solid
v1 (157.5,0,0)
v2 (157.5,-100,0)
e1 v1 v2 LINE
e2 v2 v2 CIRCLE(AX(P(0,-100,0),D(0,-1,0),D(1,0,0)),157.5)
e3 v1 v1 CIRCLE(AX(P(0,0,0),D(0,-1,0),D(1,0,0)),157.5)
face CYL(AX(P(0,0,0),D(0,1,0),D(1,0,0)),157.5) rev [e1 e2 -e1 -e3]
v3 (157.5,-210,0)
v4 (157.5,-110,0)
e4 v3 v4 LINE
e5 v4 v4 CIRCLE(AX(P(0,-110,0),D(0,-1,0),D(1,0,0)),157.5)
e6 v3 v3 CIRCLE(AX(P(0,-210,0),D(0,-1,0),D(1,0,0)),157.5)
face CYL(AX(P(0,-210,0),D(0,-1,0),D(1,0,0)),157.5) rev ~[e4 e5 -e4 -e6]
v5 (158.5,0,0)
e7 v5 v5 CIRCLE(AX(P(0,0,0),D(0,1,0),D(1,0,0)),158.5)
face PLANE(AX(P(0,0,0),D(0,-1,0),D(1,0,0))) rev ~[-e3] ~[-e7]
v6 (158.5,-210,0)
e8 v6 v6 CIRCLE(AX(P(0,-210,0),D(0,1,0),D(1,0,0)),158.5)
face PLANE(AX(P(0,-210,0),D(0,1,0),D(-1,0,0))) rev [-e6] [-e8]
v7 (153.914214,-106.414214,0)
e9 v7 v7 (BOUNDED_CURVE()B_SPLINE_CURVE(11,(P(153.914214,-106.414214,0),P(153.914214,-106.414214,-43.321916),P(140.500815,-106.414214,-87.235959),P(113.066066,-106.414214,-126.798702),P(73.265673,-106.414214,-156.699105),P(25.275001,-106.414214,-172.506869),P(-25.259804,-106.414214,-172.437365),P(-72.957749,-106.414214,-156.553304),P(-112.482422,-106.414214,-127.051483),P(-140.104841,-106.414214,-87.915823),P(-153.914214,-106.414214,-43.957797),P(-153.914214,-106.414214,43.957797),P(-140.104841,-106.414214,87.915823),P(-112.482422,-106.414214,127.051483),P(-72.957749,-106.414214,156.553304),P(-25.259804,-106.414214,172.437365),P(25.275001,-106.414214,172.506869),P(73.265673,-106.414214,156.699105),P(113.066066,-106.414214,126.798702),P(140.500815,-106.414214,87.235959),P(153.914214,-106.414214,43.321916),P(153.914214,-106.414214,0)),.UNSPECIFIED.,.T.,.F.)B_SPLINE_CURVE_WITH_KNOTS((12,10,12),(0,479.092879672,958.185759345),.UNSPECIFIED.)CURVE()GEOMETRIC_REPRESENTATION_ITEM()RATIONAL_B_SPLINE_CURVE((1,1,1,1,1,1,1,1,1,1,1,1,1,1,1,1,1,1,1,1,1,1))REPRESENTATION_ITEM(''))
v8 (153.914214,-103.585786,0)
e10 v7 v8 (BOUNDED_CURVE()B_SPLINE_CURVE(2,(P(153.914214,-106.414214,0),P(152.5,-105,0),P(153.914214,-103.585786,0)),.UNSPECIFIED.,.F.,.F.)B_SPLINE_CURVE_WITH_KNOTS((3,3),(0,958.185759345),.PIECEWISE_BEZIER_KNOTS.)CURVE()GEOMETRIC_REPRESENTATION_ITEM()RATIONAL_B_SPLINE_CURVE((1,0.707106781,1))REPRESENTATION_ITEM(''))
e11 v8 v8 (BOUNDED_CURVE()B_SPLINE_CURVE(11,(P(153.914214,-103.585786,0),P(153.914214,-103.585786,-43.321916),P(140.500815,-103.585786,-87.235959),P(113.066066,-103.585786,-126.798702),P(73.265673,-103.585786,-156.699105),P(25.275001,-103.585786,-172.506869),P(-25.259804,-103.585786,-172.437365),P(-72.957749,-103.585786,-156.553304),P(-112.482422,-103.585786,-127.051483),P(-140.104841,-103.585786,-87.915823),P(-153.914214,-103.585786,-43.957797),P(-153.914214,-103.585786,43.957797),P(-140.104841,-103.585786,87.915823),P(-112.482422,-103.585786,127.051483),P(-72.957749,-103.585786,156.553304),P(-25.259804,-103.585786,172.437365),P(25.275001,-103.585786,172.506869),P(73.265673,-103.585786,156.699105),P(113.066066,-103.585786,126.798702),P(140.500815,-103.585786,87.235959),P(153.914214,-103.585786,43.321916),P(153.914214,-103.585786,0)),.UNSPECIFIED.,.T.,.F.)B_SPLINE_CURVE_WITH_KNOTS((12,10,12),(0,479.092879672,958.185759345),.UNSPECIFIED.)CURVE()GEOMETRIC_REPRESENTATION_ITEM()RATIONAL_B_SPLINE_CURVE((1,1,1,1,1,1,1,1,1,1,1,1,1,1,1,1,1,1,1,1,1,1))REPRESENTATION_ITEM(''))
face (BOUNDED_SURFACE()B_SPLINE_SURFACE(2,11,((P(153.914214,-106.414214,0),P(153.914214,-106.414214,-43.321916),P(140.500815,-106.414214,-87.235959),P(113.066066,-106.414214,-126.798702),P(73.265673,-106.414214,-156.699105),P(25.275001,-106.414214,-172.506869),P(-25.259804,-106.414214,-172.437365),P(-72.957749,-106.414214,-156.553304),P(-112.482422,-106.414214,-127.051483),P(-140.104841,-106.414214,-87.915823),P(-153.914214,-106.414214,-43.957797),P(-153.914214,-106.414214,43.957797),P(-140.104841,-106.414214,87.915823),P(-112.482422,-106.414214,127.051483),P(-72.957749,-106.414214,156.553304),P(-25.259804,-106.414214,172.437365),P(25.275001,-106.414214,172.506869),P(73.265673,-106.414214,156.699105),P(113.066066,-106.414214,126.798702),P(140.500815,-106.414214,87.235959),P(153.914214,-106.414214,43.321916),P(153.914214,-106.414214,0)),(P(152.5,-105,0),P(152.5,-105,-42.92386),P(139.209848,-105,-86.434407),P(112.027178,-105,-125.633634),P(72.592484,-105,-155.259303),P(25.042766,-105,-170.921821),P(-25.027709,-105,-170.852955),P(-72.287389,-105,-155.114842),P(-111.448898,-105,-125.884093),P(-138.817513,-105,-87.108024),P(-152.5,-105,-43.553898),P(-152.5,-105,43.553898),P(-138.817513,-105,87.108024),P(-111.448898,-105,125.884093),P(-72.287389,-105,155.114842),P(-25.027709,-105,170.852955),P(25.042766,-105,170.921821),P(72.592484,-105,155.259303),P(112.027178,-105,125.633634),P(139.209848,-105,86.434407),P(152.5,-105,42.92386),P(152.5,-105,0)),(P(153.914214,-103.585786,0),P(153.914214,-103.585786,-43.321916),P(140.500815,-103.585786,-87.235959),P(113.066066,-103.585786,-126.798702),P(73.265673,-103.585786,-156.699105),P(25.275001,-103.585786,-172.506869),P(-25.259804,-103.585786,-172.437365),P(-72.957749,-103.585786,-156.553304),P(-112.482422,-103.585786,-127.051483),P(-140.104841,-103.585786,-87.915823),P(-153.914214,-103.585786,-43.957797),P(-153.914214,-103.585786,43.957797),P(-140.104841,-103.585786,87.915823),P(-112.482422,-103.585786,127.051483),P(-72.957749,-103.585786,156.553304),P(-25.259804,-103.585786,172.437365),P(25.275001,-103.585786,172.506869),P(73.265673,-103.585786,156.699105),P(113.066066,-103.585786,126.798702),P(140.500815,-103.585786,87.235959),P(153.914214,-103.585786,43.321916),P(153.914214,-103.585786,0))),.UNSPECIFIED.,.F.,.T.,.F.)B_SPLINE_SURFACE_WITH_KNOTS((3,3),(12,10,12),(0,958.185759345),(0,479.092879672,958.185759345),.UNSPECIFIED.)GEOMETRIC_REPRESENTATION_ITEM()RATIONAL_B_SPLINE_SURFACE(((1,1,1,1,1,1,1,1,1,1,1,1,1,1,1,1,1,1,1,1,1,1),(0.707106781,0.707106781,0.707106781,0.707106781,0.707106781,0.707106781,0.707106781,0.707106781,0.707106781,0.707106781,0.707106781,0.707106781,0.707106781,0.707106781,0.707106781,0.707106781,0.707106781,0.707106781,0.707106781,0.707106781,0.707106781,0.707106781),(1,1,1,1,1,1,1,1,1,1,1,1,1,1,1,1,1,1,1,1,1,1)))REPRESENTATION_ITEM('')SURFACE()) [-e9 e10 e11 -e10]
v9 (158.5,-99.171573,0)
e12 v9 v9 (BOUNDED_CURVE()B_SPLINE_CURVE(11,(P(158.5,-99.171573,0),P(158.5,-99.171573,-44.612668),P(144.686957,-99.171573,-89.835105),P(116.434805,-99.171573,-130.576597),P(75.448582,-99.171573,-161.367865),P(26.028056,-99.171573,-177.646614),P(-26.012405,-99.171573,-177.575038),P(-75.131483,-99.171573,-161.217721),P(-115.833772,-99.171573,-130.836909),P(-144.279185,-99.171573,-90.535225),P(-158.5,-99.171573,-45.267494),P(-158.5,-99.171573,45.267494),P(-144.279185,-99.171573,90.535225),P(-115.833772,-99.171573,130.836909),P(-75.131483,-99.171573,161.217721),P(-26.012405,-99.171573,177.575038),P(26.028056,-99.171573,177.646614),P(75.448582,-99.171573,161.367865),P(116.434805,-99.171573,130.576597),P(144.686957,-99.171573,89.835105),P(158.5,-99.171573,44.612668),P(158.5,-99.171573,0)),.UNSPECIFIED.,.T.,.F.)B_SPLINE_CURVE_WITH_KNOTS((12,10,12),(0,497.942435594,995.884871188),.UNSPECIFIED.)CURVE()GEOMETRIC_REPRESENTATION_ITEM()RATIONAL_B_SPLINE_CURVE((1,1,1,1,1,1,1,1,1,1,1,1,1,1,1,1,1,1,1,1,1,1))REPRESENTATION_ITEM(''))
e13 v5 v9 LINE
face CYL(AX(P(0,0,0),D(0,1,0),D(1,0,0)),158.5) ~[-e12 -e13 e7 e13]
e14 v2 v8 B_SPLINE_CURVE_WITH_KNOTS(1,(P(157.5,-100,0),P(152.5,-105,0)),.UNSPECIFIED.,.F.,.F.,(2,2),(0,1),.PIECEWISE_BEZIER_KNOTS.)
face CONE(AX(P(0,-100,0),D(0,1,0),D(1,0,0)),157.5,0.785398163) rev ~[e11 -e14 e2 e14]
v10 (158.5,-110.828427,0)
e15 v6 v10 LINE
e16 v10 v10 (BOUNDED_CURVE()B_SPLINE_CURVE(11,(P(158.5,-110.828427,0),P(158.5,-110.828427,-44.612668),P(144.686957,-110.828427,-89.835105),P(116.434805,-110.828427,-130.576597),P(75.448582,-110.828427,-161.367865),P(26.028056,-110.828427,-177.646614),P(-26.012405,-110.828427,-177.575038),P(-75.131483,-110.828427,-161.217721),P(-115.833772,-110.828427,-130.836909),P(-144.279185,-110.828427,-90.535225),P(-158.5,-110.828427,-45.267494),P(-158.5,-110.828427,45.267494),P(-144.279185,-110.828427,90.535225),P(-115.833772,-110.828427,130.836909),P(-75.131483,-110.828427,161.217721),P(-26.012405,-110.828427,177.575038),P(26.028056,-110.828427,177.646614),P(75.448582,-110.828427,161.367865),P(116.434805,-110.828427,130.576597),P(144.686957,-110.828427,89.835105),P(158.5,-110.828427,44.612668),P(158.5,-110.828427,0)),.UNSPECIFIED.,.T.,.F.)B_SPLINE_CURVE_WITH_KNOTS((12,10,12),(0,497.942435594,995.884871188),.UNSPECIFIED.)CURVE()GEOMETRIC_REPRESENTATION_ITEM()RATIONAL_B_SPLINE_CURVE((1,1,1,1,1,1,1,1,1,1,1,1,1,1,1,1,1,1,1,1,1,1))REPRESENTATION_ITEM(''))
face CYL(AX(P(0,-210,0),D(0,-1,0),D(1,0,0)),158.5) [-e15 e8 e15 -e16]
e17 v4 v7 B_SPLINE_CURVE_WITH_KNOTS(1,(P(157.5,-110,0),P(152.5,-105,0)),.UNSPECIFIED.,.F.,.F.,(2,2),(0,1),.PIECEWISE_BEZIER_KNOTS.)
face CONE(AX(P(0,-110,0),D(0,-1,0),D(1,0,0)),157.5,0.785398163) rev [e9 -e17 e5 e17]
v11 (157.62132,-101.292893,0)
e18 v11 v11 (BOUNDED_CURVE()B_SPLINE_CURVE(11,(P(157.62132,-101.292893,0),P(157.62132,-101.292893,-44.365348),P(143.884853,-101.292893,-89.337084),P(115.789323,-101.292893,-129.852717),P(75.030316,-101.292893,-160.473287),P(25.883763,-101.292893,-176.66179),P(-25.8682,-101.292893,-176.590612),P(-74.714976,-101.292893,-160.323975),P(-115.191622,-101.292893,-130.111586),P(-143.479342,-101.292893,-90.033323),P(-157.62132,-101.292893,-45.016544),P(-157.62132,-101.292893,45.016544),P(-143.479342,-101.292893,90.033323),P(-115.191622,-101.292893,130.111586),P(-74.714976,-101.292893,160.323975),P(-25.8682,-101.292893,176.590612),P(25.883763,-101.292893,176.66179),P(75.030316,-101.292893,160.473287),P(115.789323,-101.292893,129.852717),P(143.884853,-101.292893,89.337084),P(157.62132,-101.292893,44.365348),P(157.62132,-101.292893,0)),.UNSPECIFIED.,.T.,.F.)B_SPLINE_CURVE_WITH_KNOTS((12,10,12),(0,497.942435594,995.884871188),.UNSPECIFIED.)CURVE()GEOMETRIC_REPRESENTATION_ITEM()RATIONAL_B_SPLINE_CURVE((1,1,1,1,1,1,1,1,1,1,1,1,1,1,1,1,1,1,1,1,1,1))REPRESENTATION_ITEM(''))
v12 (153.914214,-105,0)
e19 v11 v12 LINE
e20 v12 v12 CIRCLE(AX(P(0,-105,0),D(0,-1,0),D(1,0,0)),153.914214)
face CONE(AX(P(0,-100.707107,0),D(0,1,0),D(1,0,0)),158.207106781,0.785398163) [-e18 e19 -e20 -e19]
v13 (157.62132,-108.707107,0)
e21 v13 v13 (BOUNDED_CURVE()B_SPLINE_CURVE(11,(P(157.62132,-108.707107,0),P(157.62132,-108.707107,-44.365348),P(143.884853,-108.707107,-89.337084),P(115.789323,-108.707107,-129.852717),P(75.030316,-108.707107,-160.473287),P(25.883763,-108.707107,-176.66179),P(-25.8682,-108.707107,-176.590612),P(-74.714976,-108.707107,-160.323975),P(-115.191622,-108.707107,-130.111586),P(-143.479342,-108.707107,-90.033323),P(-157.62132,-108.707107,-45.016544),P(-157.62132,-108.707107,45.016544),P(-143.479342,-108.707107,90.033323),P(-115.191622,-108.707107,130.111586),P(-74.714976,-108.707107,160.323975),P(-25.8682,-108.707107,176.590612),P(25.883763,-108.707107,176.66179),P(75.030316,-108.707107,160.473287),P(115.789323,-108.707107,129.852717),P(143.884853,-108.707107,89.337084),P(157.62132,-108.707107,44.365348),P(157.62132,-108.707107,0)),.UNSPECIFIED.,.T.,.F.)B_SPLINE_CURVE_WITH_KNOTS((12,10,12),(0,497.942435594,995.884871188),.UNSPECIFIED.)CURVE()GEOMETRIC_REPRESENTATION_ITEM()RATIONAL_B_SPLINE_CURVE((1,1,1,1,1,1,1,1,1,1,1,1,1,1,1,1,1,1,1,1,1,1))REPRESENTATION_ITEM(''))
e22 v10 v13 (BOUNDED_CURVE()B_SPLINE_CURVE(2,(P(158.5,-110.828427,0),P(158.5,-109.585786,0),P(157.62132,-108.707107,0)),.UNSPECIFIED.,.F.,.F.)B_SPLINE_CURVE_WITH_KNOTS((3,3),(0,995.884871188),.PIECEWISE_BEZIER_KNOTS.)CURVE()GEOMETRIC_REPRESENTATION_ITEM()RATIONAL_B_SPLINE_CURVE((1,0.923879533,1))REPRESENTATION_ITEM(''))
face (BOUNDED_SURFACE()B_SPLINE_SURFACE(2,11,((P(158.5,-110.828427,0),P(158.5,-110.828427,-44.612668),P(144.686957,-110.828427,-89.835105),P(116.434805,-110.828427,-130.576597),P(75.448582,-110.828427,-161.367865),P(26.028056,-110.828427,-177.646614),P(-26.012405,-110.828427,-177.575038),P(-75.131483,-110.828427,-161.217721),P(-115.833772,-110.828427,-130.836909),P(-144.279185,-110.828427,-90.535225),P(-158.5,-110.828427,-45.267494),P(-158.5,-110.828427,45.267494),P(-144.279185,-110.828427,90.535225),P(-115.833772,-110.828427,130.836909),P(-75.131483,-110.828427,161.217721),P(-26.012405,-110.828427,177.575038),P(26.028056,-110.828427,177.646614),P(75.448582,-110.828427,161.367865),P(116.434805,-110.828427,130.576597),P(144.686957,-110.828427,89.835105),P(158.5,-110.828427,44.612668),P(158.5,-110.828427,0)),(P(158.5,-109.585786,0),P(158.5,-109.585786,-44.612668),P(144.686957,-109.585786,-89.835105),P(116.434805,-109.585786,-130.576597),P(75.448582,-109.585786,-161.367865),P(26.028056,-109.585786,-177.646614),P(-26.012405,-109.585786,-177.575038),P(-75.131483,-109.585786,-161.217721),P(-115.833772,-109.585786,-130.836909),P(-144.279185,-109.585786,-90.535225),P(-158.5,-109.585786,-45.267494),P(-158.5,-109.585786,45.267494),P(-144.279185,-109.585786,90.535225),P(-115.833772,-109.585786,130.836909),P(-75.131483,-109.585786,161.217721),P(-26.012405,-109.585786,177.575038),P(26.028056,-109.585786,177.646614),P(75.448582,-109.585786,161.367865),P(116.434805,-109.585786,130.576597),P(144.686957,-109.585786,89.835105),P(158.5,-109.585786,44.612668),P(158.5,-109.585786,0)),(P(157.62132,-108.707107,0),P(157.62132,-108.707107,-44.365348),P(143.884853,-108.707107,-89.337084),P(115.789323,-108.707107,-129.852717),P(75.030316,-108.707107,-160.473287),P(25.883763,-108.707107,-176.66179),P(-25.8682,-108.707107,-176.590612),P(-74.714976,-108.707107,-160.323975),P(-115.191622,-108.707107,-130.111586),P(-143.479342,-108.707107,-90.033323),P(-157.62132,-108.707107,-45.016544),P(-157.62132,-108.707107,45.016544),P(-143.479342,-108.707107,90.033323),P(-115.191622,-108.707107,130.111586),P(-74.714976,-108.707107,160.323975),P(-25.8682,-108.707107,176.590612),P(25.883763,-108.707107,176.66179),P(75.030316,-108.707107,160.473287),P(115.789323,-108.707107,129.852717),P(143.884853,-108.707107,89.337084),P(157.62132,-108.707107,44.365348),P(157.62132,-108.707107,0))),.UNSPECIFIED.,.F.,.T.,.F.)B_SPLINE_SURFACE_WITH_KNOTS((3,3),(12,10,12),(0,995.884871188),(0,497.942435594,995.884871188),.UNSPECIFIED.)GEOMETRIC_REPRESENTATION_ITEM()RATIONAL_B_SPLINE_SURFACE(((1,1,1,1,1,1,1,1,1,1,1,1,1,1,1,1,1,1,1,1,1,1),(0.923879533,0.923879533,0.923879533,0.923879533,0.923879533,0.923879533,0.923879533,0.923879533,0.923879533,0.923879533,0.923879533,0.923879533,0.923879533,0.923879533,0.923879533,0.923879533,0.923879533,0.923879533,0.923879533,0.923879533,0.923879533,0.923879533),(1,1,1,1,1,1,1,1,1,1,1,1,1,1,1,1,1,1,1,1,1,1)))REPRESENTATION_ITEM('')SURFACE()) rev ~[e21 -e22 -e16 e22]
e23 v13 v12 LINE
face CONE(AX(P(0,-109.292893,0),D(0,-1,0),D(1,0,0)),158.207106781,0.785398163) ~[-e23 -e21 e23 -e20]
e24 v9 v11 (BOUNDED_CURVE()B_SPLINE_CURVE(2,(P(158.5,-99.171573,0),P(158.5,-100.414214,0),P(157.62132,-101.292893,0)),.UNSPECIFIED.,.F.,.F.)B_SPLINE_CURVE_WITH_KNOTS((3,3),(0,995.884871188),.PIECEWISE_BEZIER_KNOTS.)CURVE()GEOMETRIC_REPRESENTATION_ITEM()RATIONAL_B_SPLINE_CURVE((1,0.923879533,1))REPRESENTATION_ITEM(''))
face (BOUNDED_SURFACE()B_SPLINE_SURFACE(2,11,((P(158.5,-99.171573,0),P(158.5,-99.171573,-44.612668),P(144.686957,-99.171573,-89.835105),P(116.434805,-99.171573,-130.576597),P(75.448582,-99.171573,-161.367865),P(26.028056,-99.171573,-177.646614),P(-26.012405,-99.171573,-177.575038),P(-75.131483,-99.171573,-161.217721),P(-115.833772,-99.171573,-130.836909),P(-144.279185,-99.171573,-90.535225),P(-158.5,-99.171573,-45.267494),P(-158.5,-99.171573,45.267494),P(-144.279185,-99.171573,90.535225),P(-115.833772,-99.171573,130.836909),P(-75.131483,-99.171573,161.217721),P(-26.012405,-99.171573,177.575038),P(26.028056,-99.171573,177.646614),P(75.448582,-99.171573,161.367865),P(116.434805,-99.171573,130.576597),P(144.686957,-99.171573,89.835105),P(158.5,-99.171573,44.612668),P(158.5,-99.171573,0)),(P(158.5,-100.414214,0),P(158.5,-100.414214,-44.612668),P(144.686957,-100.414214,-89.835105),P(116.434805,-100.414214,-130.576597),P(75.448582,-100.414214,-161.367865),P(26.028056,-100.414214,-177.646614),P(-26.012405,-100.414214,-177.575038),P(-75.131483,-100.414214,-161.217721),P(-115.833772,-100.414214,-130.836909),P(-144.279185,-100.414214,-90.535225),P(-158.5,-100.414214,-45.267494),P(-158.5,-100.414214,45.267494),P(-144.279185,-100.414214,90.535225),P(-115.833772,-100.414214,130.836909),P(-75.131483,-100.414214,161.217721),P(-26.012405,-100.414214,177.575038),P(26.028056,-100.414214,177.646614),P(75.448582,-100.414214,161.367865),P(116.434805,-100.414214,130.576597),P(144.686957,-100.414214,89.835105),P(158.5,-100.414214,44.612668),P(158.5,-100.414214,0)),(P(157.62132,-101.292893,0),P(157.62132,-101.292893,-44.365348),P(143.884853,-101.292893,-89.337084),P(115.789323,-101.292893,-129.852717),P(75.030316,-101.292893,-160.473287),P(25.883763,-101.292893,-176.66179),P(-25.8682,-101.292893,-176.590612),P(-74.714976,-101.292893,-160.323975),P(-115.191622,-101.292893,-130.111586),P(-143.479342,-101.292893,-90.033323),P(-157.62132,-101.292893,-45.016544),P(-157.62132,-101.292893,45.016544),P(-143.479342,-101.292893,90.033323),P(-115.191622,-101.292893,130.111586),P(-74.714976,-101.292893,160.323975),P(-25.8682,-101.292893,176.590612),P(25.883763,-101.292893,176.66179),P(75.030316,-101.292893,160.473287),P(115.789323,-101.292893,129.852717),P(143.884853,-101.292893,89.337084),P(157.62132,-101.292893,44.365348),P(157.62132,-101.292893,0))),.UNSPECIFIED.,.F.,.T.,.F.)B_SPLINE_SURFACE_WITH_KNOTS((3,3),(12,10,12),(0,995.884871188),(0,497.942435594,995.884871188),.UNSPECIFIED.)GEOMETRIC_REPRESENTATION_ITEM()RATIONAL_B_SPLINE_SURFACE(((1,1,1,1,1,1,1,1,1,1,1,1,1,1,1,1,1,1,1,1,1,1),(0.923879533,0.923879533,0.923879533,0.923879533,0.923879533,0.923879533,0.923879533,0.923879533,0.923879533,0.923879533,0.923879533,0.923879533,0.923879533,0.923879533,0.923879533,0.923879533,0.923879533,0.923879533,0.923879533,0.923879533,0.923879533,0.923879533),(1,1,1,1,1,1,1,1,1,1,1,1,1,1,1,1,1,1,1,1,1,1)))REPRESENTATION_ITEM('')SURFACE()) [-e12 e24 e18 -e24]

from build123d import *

# Parameters (mm, degrees)
F0_R     = 157.5
F1_DEPTH = 100
F2_R     = 157.5
F3_DEPTH = 5
F3_TAPER = 45
F4_T     = 1
F6_R     = 2
F7_R     = 3


with BuildPart() as f1:
    # F0 (on Front) → F1 (new body)
    with BuildSketch(Plane.XZ):
        Circle(F0_R)
    extrude(amount=F1_DEPTH)

    # F2 (on face) → F3 (join)
    with BuildSketch(Plane.XZ.offset(100)):
        Circle(F2_R)
    extrude(amount=F3_DEPTH, taper=F3_TAPER)

    # F4
    f4_openings = [f1.faces().sort_by_distance(p)[0] for p in [
        (0, -105, 0),
        (0, 0, 0),
    ]]
    offset(amount=F4_T, openings=f4_openings, kind=Kind.INTERSECTION)

    # F5: F1 across face


with BuildPart() as f1_1:
    add(f1.part)
    add(f1.part.mirror(Plane.XZ.offset(105)))

    # F6
    f6_edges = [f1_1.edges().sort_by_distance(p)[0] for p in [
        (-152.5, -105, 0),
    ]]
    fillet(f6_edges, radius=F6_R)

    # F7
    f7_edges = [f1_1.edges().sort_by_distance(p)[0] for p in [
        (-158.5, -100.414214, 0),
        (-158.5, -109.585786, 0),
    ]]
    fillet(f7_edges, radius=F7_R)


solid = f1_1.part
